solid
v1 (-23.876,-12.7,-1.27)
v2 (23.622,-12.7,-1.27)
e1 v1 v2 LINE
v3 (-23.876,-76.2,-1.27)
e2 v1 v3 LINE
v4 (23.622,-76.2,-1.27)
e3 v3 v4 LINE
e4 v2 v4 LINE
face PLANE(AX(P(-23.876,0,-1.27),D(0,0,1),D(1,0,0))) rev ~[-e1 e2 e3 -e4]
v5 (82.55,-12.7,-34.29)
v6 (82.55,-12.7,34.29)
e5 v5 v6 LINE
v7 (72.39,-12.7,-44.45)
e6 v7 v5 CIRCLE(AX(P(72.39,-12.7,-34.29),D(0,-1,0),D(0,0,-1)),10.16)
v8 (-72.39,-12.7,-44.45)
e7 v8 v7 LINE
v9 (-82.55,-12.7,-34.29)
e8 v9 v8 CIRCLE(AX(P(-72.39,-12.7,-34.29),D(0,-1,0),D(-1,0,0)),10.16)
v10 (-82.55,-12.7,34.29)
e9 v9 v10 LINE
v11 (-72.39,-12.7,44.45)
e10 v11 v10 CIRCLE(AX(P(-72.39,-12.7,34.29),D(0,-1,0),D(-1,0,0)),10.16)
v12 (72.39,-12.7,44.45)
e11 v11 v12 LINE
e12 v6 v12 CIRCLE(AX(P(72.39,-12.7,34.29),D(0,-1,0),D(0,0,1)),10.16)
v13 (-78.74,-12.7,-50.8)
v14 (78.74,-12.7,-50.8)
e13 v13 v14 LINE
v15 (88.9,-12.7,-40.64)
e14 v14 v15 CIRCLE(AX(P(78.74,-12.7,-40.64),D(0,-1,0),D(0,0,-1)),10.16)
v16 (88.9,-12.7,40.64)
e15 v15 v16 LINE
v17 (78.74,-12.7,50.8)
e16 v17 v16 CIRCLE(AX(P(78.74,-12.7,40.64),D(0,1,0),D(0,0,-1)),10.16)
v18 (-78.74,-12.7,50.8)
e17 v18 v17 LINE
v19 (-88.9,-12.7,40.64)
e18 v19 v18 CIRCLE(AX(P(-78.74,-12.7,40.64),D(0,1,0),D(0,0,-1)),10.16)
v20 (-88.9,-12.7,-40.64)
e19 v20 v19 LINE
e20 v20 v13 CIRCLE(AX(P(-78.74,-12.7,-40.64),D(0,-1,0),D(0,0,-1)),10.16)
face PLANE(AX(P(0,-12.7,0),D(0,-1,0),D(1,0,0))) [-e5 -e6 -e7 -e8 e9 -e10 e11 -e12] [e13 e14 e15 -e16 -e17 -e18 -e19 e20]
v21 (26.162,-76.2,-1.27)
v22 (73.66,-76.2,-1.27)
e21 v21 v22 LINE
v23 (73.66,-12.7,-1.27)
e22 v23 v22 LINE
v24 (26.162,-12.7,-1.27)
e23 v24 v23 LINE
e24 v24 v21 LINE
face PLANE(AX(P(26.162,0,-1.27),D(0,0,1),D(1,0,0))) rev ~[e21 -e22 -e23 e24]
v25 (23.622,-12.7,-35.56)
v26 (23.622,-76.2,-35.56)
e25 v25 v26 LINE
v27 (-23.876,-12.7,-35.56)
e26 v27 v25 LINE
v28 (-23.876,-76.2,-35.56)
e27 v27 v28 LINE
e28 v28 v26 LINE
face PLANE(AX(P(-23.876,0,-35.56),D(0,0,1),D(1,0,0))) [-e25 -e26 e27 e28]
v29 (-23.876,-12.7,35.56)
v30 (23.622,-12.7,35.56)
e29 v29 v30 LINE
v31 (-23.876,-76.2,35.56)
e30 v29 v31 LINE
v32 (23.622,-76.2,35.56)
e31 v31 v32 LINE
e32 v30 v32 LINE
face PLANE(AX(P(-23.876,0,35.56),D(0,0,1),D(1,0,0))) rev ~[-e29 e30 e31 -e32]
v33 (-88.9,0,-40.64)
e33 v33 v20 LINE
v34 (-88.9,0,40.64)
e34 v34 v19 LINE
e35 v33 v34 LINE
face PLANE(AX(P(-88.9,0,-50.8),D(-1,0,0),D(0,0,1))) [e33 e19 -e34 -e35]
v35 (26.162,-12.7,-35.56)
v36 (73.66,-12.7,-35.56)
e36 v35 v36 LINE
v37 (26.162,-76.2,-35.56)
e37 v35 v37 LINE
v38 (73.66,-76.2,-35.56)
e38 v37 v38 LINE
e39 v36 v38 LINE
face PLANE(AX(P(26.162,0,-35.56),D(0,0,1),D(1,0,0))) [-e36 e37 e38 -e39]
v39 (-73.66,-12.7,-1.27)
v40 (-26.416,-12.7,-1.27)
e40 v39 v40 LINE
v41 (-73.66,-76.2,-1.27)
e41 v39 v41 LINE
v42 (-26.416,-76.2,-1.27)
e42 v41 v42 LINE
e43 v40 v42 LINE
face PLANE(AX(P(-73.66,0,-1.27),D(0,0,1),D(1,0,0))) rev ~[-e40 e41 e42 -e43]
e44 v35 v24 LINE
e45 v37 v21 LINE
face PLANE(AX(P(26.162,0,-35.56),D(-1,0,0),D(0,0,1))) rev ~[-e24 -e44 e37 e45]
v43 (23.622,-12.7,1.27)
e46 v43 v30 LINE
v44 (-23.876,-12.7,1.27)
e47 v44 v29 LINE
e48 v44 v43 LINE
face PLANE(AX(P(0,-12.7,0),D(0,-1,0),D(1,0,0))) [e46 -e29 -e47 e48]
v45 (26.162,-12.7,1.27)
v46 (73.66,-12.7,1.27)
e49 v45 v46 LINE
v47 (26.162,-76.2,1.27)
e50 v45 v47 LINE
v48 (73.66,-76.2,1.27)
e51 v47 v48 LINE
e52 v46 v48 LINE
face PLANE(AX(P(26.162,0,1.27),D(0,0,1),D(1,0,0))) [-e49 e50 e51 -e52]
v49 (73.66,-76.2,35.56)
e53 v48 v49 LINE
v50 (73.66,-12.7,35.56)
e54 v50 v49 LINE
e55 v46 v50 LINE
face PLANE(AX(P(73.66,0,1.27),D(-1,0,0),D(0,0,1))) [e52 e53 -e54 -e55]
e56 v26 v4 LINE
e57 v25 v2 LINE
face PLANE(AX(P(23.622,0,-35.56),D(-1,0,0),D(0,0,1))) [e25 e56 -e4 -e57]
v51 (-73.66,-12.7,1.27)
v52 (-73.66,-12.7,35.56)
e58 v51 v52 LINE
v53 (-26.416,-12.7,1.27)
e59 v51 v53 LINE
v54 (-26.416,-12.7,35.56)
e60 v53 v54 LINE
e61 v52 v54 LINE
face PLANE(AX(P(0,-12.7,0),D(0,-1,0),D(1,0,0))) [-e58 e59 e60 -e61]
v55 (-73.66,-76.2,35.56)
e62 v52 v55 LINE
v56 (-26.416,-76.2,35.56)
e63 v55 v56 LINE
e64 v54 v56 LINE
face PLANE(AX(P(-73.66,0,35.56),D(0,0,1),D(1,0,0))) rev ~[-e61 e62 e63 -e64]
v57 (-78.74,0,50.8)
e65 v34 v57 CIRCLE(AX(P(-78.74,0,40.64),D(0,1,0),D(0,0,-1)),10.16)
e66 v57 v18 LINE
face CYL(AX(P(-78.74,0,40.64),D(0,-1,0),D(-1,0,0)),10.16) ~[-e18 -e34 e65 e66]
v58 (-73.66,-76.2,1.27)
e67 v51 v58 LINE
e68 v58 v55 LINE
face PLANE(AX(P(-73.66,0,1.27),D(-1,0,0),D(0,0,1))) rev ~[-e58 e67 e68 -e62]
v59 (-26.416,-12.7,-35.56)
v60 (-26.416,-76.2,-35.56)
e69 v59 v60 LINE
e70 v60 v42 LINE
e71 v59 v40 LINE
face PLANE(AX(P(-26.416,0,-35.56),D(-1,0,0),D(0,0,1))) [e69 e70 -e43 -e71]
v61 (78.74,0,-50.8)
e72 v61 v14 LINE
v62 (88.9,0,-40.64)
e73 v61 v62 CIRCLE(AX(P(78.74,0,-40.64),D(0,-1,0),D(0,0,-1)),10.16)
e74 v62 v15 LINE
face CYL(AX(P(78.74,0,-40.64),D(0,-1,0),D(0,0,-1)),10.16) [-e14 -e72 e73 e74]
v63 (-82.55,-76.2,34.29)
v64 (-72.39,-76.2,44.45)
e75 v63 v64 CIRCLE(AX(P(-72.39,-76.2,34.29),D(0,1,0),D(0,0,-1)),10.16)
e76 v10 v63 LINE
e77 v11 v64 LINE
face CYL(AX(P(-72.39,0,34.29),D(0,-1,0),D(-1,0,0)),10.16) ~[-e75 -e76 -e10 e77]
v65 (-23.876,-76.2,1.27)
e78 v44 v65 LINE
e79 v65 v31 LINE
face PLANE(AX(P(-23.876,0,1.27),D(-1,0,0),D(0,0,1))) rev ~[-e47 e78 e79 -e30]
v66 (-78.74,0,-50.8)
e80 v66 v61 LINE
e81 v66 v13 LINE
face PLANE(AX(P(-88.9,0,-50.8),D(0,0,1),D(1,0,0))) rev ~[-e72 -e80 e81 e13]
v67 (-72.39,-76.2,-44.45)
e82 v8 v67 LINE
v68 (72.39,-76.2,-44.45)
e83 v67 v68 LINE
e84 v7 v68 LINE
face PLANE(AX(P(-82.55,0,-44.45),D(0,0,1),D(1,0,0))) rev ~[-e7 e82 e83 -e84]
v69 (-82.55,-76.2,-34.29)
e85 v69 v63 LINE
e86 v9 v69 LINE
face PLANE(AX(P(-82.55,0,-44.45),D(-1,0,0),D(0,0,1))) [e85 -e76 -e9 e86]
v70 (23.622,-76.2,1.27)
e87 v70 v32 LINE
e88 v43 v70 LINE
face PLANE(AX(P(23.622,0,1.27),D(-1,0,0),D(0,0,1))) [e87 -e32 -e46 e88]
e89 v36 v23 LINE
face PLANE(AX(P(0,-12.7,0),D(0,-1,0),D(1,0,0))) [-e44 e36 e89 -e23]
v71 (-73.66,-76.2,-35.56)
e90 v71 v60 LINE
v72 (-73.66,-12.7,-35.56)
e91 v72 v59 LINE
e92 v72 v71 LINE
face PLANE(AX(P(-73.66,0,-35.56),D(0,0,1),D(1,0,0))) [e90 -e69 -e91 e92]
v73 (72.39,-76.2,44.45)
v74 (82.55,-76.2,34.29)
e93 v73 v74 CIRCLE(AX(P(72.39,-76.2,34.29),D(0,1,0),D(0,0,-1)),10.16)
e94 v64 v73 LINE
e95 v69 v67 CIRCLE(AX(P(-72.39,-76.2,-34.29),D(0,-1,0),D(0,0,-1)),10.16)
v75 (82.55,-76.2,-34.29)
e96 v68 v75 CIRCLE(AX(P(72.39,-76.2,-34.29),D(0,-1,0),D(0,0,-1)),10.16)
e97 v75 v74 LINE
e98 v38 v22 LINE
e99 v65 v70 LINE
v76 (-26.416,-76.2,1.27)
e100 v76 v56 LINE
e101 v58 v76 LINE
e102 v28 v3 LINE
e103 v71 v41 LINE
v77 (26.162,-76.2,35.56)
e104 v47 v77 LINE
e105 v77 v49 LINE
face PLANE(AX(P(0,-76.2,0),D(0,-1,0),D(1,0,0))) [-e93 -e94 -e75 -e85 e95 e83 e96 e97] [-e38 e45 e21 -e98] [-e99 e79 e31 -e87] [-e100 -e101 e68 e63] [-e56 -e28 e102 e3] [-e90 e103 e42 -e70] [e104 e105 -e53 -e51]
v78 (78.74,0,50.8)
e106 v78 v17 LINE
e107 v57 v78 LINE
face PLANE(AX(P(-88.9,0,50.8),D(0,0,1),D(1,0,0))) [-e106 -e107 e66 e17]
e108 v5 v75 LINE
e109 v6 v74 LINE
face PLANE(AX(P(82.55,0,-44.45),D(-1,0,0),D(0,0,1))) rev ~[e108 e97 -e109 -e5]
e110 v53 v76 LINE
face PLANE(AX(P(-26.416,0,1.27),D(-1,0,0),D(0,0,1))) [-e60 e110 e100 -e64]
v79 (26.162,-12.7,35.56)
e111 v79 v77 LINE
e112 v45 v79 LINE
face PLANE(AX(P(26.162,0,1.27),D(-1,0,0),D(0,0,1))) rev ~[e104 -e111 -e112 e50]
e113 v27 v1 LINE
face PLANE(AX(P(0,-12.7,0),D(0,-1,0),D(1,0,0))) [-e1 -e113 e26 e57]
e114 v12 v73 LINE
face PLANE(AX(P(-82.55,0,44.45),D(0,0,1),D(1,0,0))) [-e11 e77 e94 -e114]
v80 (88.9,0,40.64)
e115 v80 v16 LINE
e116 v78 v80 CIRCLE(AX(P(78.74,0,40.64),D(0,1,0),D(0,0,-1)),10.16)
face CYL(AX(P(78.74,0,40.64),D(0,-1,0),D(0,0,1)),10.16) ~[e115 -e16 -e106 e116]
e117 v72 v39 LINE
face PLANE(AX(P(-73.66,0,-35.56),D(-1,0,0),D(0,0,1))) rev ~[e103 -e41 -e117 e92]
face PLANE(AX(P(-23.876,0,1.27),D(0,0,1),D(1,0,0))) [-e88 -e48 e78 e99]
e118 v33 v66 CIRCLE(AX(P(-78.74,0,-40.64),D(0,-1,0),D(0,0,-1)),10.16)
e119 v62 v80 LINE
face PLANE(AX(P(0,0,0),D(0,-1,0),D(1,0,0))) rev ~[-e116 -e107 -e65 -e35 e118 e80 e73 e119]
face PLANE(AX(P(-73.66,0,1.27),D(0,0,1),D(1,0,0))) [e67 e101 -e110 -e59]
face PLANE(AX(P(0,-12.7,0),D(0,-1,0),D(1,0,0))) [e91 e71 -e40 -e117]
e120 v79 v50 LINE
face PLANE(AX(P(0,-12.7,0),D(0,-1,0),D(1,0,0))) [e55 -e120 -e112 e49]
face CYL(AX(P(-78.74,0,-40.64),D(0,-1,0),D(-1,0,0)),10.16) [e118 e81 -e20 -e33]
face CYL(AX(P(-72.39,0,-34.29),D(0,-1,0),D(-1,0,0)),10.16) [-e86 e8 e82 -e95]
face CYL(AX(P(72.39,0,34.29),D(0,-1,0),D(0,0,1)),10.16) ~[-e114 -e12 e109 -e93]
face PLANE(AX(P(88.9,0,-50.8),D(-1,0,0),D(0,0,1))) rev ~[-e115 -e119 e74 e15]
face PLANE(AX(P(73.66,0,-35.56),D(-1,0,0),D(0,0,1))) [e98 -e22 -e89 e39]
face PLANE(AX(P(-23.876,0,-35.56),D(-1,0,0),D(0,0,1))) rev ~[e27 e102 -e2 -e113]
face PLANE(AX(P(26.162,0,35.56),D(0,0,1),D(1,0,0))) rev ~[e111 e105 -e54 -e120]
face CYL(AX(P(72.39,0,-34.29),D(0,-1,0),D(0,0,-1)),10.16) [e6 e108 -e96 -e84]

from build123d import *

# Parameters (mm, degrees)
F0_W     = 165.1
F0_H     = 88.9
F0_W_2   = 152.4
F0_H_2   = 76.2
F1_DEPTH = 76.2
F0_W_3   = 47.244
F0_H_3   = 34.29
F0_W_4   = 47.498
F2_DEPTH = 76.2
F3_R     = 10.16
F4_W     = 177.8
F4_H     = 101.6
F5_DEPTH = 12.7
F6_R     = 10.16


# Not quite as in the source:
# - a feature names something its author has since deleted; it is built from what else it names


with BuildPart() as f1:
    # F0 (on Front) → F1 (new body)
    with BuildSketch(Plane.XZ):
        Rectangle(F0_W, F0_H)
        Rectangle(F0_W_2, F0_H_2, mode=Mode.SUBTRACT)
    extrude(amount=F1_DEPTH)

    # F0 (on Front) → F2 (join)
    with BuildSketch(Plane.XZ):
        Rectangle(F0_W_2, F0_H_2)
        with Locations((-50.038, -18.415)):
            Rectangle(F0_W_3, F0_H_3, mode=Mode.SUBTRACT)
        with Locations((-0.127, -18.415)):
            Rectangle(F0_W_4, F0_H_3, mode=Mode.SUBTRACT)
        with Locations((49.911, -18.415)):
            Rectangle(F0_W_4, F0_H_3, mode=Mode.SUBTRACT)
        with Locations((-50.038, 18.415)):
            Rectangle(F0_W_3, F0_H_3, mode=Mode.SUBTRACT)
        with Locations((-0.127, 18.415)):
            Rectangle(F0_W_4, F0_H_3, mode=Mode.SUBTRACT)
        with Locations((49.911, 18.415)):
            Rectangle(F0_W_4, F0_H_3, mode=Mode.SUBTRACT)
    extrude(amount=F2_DEPTH)

    # F3
    f3_edges = [f1.edges().sort_by_distance(p)[0] for p in [
        (-82.55, -38.1, -44.45),
        (82.55, -38.1, -44.45),
        (-82.55, -38.1, 44.45),
        (82.55, -38.1, 44.45),
    ]]
    fillet(f3_edges, radius=F3_R)

    # F4 (on Front) → F5 (join)
    with BuildSketch(Plane.XZ):
        Rectangle(F4_W, F4_H)
    extrude(amount=F5_DEPTH)

    # F6
    f6_edges = [f1.edges().sort_by_distance(p)[0] for p in [
        (-88.9, -6.35, 50.8),
        (88.9, -6.35, 50.8),
        (-88.9, -6.35, -50.8),
        (88.9, -6.35, -50.8),
    ]]
    fillet(f6_edges, radius=F6_R)


solid = f1.part
